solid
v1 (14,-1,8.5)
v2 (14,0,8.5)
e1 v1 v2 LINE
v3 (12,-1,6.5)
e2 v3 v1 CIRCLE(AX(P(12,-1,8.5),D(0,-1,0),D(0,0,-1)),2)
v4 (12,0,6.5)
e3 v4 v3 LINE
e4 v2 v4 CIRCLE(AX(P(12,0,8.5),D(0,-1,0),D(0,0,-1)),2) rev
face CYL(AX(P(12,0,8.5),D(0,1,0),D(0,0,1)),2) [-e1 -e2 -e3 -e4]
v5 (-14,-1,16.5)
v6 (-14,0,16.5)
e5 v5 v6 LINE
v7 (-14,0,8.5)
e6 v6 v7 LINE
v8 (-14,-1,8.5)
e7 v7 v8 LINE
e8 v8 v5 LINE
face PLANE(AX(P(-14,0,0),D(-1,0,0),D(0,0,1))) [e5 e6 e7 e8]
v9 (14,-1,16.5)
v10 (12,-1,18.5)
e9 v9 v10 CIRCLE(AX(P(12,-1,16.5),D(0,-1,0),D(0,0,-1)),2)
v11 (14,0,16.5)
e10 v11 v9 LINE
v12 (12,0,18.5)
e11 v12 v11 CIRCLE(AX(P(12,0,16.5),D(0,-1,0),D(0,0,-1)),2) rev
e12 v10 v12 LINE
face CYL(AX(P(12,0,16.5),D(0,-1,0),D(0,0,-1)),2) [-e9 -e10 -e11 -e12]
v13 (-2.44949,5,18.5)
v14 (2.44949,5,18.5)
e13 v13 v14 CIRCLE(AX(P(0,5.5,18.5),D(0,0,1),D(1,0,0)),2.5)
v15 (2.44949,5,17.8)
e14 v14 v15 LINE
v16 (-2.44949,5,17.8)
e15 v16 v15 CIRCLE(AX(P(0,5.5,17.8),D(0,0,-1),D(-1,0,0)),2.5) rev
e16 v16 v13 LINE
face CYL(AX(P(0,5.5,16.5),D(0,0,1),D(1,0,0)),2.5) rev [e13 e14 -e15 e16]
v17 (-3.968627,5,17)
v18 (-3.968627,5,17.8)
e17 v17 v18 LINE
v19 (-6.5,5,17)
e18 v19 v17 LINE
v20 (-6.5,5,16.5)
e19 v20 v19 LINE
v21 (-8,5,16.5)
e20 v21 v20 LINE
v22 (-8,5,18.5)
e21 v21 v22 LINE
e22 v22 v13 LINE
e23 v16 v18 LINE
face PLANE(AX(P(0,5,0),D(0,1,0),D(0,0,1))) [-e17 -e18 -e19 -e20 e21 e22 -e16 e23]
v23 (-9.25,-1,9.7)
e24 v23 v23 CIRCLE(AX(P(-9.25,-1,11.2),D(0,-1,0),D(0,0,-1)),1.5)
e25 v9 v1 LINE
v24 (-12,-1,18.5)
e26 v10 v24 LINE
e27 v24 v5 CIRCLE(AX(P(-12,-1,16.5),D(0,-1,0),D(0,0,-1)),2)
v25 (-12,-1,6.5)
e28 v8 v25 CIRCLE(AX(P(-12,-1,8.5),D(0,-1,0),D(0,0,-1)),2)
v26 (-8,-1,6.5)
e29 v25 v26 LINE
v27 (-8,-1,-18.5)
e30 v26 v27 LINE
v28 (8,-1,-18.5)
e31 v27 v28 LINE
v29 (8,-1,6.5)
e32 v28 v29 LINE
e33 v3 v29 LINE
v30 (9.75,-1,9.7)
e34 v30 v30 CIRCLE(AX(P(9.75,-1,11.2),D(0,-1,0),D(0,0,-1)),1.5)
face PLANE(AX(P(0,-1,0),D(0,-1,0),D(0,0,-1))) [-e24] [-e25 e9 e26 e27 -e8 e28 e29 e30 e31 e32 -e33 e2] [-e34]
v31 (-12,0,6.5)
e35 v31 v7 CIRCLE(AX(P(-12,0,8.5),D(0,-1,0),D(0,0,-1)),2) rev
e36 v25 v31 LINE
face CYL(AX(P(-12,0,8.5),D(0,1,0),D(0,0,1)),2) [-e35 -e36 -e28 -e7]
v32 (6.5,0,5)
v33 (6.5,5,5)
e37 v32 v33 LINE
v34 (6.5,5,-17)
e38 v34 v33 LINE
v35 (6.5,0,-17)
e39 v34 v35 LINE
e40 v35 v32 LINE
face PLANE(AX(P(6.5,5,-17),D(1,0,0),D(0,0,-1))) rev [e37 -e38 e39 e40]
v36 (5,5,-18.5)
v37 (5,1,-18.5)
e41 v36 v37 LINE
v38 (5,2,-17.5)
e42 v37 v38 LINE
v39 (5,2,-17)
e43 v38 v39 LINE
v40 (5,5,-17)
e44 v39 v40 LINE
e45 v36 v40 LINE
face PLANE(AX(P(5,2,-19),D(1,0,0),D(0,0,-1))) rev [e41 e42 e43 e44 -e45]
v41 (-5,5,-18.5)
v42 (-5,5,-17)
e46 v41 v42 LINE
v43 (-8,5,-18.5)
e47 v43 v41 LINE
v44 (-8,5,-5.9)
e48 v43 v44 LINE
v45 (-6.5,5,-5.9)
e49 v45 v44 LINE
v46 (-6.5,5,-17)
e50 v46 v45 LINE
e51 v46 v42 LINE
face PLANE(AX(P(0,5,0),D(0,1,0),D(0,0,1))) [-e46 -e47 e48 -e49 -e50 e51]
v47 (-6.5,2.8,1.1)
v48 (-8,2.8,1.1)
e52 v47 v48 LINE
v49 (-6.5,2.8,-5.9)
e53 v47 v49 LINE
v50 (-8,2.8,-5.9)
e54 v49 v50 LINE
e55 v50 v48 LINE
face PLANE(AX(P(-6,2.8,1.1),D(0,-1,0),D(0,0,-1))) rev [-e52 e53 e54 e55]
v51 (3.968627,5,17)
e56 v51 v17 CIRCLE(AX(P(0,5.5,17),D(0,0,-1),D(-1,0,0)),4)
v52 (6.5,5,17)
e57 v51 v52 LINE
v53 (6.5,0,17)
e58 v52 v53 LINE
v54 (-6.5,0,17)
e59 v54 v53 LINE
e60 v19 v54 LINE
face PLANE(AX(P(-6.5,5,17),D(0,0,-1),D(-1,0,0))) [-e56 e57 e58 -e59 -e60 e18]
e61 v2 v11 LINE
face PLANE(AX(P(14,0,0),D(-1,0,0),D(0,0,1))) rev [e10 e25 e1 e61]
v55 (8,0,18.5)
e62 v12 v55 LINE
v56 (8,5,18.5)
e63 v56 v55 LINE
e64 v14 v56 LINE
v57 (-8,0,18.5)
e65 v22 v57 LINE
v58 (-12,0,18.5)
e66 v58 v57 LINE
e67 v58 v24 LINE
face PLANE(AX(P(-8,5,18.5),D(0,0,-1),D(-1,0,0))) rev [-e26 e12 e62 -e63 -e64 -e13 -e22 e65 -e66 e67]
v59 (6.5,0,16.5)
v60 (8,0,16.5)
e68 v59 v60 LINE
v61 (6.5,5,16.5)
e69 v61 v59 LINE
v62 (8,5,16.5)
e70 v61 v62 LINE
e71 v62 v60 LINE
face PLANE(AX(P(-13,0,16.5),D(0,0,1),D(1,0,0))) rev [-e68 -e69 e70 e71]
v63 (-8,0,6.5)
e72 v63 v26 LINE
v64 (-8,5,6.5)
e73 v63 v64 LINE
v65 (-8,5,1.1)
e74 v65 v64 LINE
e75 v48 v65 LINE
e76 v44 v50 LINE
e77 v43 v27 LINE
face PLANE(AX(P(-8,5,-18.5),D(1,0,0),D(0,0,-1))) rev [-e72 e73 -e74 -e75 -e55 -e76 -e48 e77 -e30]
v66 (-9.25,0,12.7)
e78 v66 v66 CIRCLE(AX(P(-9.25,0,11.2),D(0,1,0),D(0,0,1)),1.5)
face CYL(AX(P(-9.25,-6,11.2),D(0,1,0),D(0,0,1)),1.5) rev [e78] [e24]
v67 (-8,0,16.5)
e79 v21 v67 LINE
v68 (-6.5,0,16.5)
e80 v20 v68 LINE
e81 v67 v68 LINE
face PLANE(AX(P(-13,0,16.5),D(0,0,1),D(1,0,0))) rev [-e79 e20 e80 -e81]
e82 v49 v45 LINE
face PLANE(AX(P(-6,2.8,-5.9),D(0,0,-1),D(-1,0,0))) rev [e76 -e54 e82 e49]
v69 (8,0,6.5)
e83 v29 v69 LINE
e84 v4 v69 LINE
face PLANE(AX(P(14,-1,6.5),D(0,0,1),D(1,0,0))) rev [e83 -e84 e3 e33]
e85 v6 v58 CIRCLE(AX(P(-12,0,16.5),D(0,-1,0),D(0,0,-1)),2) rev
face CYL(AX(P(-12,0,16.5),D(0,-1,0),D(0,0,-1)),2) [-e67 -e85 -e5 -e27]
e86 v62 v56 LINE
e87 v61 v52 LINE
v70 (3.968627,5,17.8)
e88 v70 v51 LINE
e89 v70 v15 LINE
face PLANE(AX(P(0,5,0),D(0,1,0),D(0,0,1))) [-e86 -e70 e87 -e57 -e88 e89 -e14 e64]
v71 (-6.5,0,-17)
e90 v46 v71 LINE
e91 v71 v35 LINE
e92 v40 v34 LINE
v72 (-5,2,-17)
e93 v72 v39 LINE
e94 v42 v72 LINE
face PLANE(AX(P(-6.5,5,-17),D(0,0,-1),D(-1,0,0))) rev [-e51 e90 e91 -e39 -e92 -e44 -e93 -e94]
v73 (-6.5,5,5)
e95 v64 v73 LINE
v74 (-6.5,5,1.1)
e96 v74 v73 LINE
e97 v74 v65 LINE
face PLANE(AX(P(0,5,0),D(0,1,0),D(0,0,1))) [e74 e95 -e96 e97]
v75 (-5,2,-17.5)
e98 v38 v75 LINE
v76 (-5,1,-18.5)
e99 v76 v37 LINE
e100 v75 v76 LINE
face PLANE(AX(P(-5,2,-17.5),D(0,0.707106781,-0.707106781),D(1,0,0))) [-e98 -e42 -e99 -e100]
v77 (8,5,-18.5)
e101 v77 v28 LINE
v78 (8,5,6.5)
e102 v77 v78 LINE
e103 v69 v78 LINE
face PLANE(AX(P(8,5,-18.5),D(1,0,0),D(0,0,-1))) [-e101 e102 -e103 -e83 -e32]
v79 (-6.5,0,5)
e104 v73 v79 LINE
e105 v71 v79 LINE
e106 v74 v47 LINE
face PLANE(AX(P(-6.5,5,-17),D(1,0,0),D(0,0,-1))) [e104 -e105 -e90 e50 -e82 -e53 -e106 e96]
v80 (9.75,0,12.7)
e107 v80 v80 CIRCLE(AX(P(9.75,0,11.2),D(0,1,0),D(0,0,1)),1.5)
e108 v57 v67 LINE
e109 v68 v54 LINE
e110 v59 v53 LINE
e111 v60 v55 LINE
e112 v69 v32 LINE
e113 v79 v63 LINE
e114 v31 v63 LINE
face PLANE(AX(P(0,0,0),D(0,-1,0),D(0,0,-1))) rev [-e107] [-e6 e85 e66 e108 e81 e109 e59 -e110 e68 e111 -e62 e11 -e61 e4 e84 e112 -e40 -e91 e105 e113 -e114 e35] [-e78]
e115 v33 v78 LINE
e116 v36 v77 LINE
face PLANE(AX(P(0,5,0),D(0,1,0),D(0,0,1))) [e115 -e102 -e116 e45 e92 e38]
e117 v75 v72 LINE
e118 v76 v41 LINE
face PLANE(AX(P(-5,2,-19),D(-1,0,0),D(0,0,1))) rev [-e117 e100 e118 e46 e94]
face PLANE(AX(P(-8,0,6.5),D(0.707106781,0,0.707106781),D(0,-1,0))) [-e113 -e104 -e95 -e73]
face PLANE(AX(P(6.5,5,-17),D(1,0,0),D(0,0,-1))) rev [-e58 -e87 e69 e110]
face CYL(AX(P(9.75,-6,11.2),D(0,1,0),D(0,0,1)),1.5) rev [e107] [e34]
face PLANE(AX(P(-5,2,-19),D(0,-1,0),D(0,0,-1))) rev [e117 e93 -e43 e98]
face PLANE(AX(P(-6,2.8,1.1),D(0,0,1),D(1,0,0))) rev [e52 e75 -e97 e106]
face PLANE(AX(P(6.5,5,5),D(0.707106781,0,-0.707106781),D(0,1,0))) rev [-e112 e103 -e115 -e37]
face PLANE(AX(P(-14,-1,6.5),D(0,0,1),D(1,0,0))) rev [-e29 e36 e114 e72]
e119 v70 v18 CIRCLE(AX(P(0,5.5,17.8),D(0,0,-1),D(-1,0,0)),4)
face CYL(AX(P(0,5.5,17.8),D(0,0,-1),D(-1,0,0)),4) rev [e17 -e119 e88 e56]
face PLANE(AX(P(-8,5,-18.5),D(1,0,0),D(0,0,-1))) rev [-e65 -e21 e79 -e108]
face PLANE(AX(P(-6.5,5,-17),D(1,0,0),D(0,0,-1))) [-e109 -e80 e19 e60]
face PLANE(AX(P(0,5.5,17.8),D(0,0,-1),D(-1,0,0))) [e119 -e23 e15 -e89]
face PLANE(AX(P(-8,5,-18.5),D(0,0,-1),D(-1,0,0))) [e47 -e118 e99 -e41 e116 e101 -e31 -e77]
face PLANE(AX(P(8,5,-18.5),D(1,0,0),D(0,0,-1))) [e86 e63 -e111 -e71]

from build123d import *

# Parameters (mm, degrees)
SKETCH1_W           = 16
SKETCH1_H           = 37
SKETCH1_W_2         = 13
SKETCH1_H_2         = 34
BOSS_EXTRUDE1_DEPTH = 5
SKETCH2_W           = 16
SKETCH2_H           = 37
BOSS_EXTRUDE2_DEPTH = 1
SKETCH3_W           = 10
SKETCH3_H           = 5
CUT_EXTRUDE1_DEPTH  = 21
SKETCH4_W           = 7
SKETCH4_H           = 2.2
CUT_EXTRUDE2_DEPTH  = 2
SKETCH5_R           = 2.5
CUT_EXTRUDE3_DEPTH  = 2
SKETCH6_W           = 10
SKETCH6_H           = 3
CUT_EXTRUDE4_DEPTH  = 2
CHAMFER1_SIZE       = 1
SKETCH7_W           = 12
SKETCH7_H           = 1
BOSS_EXTRUDE3_DEPTH = 6
SKETCH8_W           = 12
SKETCH8_H           = 1
BOSS_EXTRUDE4_DEPTH = 6
FILLET1_R           = 2
SKETCH9_R           = 1.5
CUT_EXTRUDE5_DEPTH  = 6
SKETCH12_R          = 4
CUT_EXTRUDE6_DEPTH  = 0.8
CHAMFER2_SIZE       = 1.5


with BuildPart() as part:
    # Sketch1 → Boss-Extrude1 (new body)
    with BuildSketch(Plane(origin=(0, 0, 0), x_dir=(1, 0, 0), z_dir=(0, 1, 0))):
        Rectangle(SKETCH1_W, SKETCH1_H)
        Rectangle(SKETCH1_W_2, SKETCH1_H_2, mode=Mode.SUBTRACT)
    extrude(amount=BOSS_EXTRUDE1_DEPTH)

    # Sketch2 → Boss-Extrude2 (add)
    with BuildSketch(Plane.XZ):
        Rectangle(SKETCH2_W, SKETCH2_H)
    extrude(amount=BOSS_EXTRUDE2_DEPTH)

    # Sketch3 → Cut-Extrude1 (cut)
    with BuildSketch(Plane(origin=(8, 0, 0), x_dir=(0, 0, -1), z_dir=(1, 0, 0))):
        with Locations((-11.5, 2.5)):
            Rectangle(SKETCH3_W, SKETCH3_H)
    extrude(amount=-CUT_EXTRUDE1_DEPTH, mode=Mode.SUBTRACT)

    # Sketch4 → Cut-Extrude2 (cut)
    with BuildSketch(Plane.ZY.offset(8)):
        with Locations((-2.4, 3.9)):
            Rectangle(SKETCH4_W, SKETCH4_H)
    extrude(amount=-CUT_EXTRUDE2_DEPTH, mode=Mode.SUBTRACT)

    # Sketch5 → Cut-Extrude3 (cut)
    with BuildSketch(Plane.XY.offset(18.5)):
        with Locations((0, 5.5)):
            Circle(SKETCH5_R)
    extrude(amount=-CUT_EXTRUDE3_DEPTH, mode=Mode.SUBTRACT)

    # Sketch6 → Cut-Extrude4 (cut)
    with BuildSketch(Plane.XY.offset(-17)):
        with Locations((0, 3.5)):
            Rectangle(SKETCH6_W, SKETCH6_H)
    extrude(amount=-CUT_EXTRUDE4_DEPTH, mode=Mode.SUBTRACT)

    # Chamfer1
    chamfer1_edges = [part.edges().sort_by_distance(p)[0] for p in [
        (0, 2, -18.5),
    ]]
    chamfer(chamfer1_edges, length=CHAMFER1_SIZE)

    # Sketch7 → Boss-Extrude3 (add)
    with BuildSketch(Plane(origin=(8, 0, 0), x_dir=(0, 0, -1), z_dir=(1, 0, 0))):
        with Locations((-12.5, -0.5)):
            Rectangle(SKETCH7_W, SKETCH7_H)
    extrude(amount=BOSS_EXTRUDE3_DEPTH)

    # Sketch8 → Boss-Extrude4 (add)
    with BuildSketch(Plane.ZY.offset(8)):
        with Locations((12.5, -0.5)):
            Rectangle(SKETCH8_W, SKETCH8_H)
    extrude(amount=BOSS_EXTRUDE4_DEPTH)

    # Fillet1
    fillet1_edges = [part.edges().sort_by_distance(p)[0] for p in [
        (14, -0.5, 18.5),
        (14, -0.5, 6.5),
        (-14, -0.5, 18.5),
        (-14, -0.5, 6.5),
    ]]
    fillet(fillet1_edges, radius=FILLET1_R)

    # Sketch9 → Cut-Extrude5 (cut)
    with BuildSketch(Plane(origin=(0, 0, 0), x_dir=(1, 0, 0), z_dir=(0, 1, 0))):
        with Locations(Location((-9.25, -11.2, 0), (0, 0, 270))):
            Circle(SKETCH9_R)
        with Locations(Location((9.75, -11.2, 0), (0, 0, 270))):
            Circle(SKETCH9_R)
    extrude(amount=-CUT_EXTRUDE5_DEPTH, mode=Mode.SUBTRACT)

    # Sketch12 → Cut-Extrude6 (cut)
    with BuildSketch(Plane(origin=(0, 0, 17), x_dir=(-1, 0, 0), z_dir=(0, 0, -1))):
        with Locations((0, 5.5)):
            Circle(SKETCH12_R)
    extrude(amount=-CUT_EXTRUDE6_DEPTH, mode=Mode.SUBTRACT)

    # Chamfer2
    chamfer2_edges = [part.edges().sort_by_distance(p)[0] for p in [
        (6.5, 2.5, 6.5),
        (-6.5, 2.5, 6.5),
    ]]
    chamfer(chamfer2_edges, length=CHAMFER2_SIZE - 0.0001)  # a hair under: the kernel refuses the full size


solid = part.part
